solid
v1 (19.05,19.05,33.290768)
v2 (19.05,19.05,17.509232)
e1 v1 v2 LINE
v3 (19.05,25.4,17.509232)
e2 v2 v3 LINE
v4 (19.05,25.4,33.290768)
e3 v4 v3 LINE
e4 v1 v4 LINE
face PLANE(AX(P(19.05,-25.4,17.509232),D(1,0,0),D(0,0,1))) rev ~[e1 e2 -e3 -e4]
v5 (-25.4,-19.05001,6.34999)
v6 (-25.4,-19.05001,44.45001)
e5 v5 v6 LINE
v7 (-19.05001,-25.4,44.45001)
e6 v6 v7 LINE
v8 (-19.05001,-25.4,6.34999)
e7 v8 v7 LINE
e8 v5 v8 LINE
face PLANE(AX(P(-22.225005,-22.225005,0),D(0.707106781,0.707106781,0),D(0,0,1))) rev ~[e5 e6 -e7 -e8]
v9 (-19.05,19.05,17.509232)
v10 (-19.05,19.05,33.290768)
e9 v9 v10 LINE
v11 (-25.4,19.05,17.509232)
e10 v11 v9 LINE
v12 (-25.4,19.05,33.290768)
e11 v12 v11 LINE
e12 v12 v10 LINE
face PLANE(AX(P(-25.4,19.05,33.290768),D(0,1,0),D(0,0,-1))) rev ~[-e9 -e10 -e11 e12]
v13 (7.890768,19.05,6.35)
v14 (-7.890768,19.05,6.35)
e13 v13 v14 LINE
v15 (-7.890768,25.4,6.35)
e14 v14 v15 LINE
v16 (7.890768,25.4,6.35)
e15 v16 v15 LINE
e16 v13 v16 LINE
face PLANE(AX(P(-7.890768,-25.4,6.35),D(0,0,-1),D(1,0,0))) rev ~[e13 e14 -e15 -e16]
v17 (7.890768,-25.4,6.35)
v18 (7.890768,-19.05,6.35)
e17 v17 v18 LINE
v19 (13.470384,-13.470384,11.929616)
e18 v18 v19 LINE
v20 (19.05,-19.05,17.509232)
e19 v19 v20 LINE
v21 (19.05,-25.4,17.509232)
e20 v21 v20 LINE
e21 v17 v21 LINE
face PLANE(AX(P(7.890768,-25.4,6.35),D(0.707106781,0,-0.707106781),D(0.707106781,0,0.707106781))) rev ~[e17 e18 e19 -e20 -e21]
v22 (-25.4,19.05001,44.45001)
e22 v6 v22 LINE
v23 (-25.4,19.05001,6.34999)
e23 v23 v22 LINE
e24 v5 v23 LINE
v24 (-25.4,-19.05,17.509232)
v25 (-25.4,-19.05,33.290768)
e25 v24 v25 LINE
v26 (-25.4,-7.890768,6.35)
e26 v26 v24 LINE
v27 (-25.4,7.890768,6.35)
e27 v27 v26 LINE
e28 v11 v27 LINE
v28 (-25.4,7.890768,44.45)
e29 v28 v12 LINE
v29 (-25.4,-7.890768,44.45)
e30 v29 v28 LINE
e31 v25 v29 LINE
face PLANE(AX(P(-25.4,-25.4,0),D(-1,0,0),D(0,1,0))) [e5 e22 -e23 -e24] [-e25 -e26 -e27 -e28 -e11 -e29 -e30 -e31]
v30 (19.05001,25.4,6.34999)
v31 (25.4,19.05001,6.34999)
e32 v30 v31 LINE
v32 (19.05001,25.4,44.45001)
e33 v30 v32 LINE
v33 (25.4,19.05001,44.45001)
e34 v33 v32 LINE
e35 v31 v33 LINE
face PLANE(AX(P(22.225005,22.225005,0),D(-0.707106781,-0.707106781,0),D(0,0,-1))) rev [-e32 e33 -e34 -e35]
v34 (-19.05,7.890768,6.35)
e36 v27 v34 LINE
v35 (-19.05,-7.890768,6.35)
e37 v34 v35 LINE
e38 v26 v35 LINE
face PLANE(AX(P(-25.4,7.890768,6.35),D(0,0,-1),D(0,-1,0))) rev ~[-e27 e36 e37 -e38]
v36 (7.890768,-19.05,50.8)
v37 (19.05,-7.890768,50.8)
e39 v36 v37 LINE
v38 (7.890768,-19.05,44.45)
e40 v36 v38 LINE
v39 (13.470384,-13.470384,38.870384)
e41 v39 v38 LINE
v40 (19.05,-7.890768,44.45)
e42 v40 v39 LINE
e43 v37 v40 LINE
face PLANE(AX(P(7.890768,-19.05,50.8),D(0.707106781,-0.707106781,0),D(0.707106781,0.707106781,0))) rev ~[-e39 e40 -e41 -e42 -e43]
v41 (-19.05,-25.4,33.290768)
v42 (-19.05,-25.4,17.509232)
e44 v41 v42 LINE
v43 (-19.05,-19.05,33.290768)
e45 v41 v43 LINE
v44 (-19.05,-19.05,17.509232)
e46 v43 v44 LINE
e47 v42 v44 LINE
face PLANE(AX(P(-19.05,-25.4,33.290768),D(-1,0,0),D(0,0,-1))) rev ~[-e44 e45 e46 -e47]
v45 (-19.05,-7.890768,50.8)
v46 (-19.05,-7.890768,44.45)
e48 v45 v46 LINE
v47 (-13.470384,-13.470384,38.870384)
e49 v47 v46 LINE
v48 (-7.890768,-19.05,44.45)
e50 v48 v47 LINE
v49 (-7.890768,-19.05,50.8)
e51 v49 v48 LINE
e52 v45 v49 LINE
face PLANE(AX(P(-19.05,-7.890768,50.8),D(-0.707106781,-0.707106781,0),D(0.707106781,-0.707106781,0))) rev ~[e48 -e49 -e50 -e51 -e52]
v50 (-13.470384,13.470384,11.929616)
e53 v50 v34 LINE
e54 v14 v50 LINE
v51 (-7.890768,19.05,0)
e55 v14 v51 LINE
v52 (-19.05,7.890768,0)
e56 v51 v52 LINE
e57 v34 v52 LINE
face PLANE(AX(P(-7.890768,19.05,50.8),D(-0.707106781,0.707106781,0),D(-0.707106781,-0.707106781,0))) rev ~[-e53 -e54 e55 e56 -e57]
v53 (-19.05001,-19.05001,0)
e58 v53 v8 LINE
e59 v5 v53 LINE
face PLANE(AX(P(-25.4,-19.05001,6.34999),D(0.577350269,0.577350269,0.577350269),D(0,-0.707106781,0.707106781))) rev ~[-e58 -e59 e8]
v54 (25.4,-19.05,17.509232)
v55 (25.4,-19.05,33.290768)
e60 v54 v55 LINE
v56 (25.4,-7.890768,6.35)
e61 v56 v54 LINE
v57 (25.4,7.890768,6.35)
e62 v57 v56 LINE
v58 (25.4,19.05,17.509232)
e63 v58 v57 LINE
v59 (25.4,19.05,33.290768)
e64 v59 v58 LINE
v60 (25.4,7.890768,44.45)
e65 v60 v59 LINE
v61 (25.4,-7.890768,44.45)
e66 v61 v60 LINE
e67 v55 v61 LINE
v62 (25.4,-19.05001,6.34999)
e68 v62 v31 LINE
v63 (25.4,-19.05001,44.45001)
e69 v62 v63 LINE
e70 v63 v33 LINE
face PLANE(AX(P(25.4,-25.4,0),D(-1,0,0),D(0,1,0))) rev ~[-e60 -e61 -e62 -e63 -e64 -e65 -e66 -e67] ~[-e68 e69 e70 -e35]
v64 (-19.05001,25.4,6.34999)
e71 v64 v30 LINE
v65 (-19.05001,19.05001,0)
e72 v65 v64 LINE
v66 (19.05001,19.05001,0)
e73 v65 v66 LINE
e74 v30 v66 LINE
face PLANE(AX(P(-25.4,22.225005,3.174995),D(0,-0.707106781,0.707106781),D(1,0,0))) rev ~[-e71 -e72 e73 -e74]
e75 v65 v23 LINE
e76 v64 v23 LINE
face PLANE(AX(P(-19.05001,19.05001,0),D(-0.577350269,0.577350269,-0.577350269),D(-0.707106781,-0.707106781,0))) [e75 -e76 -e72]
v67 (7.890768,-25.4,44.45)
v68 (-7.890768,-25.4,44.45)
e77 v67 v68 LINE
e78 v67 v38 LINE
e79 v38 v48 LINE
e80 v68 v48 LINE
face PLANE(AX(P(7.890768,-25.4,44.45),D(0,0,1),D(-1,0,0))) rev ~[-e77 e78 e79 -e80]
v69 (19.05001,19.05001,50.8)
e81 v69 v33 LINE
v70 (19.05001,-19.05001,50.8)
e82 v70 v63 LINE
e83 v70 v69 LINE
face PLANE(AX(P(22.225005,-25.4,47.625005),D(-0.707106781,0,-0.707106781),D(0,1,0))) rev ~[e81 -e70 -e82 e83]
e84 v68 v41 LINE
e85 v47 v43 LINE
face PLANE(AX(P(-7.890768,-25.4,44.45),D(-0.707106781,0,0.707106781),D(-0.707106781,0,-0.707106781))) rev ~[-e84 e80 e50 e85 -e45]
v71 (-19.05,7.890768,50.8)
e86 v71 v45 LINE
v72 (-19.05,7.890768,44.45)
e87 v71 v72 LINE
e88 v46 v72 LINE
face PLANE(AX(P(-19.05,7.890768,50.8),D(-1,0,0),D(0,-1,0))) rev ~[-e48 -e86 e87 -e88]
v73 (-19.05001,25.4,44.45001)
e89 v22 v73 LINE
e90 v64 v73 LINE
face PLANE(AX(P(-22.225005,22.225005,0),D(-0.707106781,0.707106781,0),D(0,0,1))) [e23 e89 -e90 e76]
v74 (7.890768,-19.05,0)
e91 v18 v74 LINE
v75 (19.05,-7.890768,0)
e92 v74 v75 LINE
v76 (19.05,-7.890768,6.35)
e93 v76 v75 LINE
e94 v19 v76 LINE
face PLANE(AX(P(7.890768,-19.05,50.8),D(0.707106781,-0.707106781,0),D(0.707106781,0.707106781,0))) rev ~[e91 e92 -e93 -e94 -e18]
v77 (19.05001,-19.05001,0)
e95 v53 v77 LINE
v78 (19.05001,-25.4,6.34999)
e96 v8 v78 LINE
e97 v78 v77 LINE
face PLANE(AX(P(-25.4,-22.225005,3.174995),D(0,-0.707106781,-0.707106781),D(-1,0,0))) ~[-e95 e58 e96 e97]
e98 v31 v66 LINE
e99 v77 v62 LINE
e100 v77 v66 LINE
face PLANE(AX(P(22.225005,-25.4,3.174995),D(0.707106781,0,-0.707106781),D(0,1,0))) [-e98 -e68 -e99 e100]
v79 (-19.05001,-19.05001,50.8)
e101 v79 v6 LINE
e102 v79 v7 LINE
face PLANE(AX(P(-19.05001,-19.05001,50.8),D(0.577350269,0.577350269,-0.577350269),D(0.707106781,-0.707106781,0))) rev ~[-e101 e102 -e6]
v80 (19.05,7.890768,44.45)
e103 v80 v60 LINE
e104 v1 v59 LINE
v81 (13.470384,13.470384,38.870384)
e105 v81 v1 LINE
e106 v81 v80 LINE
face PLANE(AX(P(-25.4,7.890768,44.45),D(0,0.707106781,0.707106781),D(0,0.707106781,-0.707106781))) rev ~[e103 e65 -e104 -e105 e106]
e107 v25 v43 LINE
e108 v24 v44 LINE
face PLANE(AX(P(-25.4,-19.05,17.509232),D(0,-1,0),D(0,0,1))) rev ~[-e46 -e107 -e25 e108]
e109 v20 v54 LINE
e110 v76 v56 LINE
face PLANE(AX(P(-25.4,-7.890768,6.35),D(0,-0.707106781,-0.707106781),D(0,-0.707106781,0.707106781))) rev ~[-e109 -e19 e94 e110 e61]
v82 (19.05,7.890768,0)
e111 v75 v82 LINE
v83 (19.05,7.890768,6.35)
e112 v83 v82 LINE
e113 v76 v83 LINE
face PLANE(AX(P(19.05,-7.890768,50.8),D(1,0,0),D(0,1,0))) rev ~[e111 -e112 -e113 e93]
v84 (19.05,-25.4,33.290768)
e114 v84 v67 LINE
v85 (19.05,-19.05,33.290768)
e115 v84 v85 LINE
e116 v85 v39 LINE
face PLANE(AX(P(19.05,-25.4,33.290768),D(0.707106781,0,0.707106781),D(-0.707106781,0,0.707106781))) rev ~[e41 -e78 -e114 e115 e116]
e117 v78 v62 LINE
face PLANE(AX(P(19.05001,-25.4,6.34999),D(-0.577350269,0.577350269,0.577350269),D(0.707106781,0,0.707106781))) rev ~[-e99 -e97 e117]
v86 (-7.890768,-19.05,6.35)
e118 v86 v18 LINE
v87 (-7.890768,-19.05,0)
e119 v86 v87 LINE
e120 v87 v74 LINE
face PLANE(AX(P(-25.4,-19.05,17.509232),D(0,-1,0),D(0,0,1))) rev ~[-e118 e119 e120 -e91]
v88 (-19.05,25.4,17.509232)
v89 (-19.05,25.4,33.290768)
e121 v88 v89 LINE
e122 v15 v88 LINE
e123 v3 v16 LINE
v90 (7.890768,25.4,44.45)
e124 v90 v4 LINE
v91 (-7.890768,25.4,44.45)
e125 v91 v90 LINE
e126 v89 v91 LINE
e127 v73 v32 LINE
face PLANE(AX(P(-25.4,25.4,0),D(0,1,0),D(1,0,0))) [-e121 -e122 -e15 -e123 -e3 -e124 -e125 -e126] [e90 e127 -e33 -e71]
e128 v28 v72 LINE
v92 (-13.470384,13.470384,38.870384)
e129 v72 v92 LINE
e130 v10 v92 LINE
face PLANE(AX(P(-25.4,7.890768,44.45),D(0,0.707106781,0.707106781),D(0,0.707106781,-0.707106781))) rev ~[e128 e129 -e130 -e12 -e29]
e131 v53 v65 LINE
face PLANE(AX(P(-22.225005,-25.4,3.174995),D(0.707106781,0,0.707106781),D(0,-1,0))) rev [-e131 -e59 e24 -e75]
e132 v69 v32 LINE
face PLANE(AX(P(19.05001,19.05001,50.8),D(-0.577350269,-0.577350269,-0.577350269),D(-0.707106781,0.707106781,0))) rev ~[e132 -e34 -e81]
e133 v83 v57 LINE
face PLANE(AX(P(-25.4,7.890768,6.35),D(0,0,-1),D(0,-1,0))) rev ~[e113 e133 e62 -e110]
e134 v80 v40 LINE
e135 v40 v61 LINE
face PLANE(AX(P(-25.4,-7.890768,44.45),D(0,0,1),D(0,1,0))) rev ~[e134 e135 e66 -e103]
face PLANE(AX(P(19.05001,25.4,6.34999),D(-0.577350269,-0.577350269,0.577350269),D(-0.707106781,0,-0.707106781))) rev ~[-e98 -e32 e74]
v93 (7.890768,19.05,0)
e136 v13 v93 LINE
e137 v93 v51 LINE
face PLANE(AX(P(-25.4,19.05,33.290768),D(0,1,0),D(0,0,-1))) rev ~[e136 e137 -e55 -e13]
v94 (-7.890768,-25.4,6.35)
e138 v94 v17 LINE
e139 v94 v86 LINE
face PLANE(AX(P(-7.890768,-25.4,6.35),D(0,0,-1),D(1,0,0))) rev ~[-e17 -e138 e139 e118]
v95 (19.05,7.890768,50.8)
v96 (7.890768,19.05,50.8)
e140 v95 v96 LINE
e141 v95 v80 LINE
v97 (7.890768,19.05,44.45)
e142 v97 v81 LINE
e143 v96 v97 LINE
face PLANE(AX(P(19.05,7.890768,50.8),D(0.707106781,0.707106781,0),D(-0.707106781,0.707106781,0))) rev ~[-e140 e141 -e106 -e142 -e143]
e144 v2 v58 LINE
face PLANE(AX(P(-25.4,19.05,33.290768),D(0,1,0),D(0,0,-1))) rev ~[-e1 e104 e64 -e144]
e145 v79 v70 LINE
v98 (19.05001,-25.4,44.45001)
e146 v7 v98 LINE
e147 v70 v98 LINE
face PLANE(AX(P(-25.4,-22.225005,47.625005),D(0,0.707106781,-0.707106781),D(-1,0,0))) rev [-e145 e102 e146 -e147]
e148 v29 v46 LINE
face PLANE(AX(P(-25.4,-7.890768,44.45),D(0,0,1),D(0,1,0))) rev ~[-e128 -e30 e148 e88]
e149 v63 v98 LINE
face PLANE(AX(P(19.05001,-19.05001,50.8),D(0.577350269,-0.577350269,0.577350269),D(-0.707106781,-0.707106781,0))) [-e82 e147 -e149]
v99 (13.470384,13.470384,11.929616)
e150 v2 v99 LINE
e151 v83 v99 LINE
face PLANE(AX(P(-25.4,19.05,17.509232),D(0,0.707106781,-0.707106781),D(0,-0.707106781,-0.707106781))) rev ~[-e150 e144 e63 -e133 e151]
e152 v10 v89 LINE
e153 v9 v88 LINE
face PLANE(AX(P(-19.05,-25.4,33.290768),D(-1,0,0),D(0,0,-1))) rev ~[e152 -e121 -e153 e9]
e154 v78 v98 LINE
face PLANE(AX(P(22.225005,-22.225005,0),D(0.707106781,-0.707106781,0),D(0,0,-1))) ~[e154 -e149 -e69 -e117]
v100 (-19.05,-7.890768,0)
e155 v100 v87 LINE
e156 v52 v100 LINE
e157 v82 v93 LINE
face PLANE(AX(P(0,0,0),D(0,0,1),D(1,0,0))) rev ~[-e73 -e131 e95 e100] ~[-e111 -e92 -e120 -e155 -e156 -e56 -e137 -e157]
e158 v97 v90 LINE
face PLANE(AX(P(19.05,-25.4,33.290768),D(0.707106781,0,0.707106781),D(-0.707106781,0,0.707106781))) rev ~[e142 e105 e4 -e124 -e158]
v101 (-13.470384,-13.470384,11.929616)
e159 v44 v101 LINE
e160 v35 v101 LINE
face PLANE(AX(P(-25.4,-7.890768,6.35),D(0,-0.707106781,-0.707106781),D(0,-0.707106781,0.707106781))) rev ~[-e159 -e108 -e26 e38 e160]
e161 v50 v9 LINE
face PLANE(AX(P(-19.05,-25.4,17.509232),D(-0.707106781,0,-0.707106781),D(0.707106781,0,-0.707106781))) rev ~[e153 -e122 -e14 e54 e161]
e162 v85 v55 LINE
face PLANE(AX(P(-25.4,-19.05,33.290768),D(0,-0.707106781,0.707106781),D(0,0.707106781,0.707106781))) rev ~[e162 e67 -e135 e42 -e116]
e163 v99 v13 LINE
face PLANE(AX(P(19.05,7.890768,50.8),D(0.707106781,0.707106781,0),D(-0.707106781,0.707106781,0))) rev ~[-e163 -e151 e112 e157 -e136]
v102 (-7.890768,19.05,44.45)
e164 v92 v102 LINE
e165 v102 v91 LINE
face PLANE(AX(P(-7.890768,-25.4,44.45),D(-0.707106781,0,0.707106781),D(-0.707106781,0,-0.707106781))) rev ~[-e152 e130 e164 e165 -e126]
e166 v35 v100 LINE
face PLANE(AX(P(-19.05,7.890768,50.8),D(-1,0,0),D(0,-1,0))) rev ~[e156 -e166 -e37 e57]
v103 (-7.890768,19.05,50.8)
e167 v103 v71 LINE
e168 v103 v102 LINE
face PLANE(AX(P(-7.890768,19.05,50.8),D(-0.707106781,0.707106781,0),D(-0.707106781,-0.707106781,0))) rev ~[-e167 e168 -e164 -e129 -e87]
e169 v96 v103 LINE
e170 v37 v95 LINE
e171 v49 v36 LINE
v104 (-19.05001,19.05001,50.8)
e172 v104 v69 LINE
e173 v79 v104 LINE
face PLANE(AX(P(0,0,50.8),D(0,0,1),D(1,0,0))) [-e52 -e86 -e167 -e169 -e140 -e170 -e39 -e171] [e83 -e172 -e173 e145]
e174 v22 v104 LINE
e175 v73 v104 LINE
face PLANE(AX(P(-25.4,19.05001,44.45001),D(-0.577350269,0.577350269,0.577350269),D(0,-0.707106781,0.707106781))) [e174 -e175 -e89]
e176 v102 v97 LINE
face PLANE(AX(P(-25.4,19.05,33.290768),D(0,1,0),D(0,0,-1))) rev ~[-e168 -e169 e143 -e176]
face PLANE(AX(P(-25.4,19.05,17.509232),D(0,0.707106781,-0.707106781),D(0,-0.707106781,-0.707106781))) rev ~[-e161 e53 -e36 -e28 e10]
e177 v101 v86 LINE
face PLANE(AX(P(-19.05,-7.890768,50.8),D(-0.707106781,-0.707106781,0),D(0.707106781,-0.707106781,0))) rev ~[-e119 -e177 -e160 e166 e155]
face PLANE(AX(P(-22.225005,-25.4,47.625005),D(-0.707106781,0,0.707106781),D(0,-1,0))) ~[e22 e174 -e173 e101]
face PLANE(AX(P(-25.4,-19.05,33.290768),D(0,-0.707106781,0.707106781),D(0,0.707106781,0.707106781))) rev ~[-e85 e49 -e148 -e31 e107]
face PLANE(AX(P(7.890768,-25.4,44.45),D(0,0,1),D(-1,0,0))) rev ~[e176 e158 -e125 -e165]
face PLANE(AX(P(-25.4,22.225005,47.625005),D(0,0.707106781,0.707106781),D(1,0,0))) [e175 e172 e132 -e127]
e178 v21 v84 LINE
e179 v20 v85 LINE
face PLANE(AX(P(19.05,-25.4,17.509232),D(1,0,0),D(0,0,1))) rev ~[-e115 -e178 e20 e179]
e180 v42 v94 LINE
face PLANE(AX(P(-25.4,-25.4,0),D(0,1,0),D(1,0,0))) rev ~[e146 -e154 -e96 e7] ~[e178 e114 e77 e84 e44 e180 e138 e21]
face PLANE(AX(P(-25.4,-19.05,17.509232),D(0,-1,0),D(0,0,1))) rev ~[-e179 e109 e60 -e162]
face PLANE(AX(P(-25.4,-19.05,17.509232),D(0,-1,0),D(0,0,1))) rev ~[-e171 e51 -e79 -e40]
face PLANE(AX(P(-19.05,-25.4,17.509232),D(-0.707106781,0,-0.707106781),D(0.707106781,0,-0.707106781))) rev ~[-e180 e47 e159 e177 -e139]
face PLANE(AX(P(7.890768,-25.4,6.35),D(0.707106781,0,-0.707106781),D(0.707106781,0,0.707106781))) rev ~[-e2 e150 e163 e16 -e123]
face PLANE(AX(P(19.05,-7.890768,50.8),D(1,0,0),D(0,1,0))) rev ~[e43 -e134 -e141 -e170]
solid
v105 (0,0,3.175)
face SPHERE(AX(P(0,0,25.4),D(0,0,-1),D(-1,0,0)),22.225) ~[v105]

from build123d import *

# Parameters (mm, degrees)
F0_W     = 50.8
F0_H     = 50.8
F1_DEPTH = 50.8
F3_DEPTH = 50.801
F5_DEPTH = 50.801
F7_DEPTH = 50.801
F8_SIZE  = 6.34999


# Not quite as in the source:
# - a fillet or chamfer is up to 0.001 mm smaller than in the source, because OpenCascade refuses the exact size


with BuildPart() as f1:
    # F0 (on Top) → F1 (new body)
    with BuildSketch(Plane.XY):
        Rectangle(F0_W, F0_H)
    extrude(amount=F1_DEPTH)

    # F2 (on face) → F3 (cut, through all)
    with BuildSketch(Plane.XY.offset(50.8)):
        Polygon((7.8907683632, 19.05), (-7.8907683632, 19.05), (-19.05, 7.8907683632), (-19.05, -7.8907683632), (-7.8907683632, -19.05), (7.8907683632, -19.05), (19.05, -7.8907683632), (19.05, 7.8907683632), align=None)
    extrude(amount=-F3_DEPTH, mode=Mode.SUBTRACT)

    # F4 (on face) → F5 (cut, through all)
    with BuildSketch(Plane(origin=(-25.4, 0, 0), x_dir=(0, -1, 0), z_dir=(-1, 0, 0))):
        Polygon((-7.8907683632, 6.35), (7.8907683632, 6.35), (19.05, 17.5092316368), (19.05, 33.2907683632), (7.8907683632, 44.45), (-7.8907683632, 44.45), (-19.05, 33.2907683632), (-19.05, 17.5092316368), align=None)
    extrude(amount=-F5_DEPTH, mode=Mode.SUBTRACT)

    # F6 (on face) → F7 (cut, through all)
    with BuildSketch(Plane.XZ.offset(25.4)):
        Polygon((-7.8907683632, 6.35), (7.8907683632, 6.35), (19.05, 17.5092316368), (19.05, 33.2907683632), (7.8907683632, 44.45), (-7.8907683632, 44.45), (-19.05, 33.2907683632), (-19.05, 17.5092316368), align=None)
    extrude(amount=-F7_DEPTH, mode=Mode.SUBTRACT)

    # F8 (size 6.35 in the source; OpenCascade refuses exactly that, so slightly less here)
    f8_edges = [f1.edges().sort_by_distance(p)[0] for p in [
        (25.4, 0, 0),
        (0, -25.4, 0),
        (25.4, -25.4, 25.4),
        (25.4, 25.4, 25.4),
        (25.4, 0, 50.8),
        (0, 25.4, 50.8),
        (-25.4, 25.4, 25.4),
        (0, 25.4, 0),
        (-25.4, 0, 0),
        (-25.4, -25.4, 25.4),
        (-25.4, 0, 50.8),
        (0, -25.4, 50.8),
    ]]
    chamfer(f8_edges, length=F8_SIZE)


with BuildPart() as f11:
    # F9 (on Front) → F11 (revolve)
    with BuildSketch(Plane.XZ):
        with BuildLine():
            Line((0, 3.175), (0, 47.625))
            ThreePointArc((0, 47.625), (-22.225, 25.4), (0, 3.175))
        make_face()
    revolve(axis=Axis((0, 0, 27.8375800699), (0, 0, 1)))


solid = Compound([f1.part, f11.part])
